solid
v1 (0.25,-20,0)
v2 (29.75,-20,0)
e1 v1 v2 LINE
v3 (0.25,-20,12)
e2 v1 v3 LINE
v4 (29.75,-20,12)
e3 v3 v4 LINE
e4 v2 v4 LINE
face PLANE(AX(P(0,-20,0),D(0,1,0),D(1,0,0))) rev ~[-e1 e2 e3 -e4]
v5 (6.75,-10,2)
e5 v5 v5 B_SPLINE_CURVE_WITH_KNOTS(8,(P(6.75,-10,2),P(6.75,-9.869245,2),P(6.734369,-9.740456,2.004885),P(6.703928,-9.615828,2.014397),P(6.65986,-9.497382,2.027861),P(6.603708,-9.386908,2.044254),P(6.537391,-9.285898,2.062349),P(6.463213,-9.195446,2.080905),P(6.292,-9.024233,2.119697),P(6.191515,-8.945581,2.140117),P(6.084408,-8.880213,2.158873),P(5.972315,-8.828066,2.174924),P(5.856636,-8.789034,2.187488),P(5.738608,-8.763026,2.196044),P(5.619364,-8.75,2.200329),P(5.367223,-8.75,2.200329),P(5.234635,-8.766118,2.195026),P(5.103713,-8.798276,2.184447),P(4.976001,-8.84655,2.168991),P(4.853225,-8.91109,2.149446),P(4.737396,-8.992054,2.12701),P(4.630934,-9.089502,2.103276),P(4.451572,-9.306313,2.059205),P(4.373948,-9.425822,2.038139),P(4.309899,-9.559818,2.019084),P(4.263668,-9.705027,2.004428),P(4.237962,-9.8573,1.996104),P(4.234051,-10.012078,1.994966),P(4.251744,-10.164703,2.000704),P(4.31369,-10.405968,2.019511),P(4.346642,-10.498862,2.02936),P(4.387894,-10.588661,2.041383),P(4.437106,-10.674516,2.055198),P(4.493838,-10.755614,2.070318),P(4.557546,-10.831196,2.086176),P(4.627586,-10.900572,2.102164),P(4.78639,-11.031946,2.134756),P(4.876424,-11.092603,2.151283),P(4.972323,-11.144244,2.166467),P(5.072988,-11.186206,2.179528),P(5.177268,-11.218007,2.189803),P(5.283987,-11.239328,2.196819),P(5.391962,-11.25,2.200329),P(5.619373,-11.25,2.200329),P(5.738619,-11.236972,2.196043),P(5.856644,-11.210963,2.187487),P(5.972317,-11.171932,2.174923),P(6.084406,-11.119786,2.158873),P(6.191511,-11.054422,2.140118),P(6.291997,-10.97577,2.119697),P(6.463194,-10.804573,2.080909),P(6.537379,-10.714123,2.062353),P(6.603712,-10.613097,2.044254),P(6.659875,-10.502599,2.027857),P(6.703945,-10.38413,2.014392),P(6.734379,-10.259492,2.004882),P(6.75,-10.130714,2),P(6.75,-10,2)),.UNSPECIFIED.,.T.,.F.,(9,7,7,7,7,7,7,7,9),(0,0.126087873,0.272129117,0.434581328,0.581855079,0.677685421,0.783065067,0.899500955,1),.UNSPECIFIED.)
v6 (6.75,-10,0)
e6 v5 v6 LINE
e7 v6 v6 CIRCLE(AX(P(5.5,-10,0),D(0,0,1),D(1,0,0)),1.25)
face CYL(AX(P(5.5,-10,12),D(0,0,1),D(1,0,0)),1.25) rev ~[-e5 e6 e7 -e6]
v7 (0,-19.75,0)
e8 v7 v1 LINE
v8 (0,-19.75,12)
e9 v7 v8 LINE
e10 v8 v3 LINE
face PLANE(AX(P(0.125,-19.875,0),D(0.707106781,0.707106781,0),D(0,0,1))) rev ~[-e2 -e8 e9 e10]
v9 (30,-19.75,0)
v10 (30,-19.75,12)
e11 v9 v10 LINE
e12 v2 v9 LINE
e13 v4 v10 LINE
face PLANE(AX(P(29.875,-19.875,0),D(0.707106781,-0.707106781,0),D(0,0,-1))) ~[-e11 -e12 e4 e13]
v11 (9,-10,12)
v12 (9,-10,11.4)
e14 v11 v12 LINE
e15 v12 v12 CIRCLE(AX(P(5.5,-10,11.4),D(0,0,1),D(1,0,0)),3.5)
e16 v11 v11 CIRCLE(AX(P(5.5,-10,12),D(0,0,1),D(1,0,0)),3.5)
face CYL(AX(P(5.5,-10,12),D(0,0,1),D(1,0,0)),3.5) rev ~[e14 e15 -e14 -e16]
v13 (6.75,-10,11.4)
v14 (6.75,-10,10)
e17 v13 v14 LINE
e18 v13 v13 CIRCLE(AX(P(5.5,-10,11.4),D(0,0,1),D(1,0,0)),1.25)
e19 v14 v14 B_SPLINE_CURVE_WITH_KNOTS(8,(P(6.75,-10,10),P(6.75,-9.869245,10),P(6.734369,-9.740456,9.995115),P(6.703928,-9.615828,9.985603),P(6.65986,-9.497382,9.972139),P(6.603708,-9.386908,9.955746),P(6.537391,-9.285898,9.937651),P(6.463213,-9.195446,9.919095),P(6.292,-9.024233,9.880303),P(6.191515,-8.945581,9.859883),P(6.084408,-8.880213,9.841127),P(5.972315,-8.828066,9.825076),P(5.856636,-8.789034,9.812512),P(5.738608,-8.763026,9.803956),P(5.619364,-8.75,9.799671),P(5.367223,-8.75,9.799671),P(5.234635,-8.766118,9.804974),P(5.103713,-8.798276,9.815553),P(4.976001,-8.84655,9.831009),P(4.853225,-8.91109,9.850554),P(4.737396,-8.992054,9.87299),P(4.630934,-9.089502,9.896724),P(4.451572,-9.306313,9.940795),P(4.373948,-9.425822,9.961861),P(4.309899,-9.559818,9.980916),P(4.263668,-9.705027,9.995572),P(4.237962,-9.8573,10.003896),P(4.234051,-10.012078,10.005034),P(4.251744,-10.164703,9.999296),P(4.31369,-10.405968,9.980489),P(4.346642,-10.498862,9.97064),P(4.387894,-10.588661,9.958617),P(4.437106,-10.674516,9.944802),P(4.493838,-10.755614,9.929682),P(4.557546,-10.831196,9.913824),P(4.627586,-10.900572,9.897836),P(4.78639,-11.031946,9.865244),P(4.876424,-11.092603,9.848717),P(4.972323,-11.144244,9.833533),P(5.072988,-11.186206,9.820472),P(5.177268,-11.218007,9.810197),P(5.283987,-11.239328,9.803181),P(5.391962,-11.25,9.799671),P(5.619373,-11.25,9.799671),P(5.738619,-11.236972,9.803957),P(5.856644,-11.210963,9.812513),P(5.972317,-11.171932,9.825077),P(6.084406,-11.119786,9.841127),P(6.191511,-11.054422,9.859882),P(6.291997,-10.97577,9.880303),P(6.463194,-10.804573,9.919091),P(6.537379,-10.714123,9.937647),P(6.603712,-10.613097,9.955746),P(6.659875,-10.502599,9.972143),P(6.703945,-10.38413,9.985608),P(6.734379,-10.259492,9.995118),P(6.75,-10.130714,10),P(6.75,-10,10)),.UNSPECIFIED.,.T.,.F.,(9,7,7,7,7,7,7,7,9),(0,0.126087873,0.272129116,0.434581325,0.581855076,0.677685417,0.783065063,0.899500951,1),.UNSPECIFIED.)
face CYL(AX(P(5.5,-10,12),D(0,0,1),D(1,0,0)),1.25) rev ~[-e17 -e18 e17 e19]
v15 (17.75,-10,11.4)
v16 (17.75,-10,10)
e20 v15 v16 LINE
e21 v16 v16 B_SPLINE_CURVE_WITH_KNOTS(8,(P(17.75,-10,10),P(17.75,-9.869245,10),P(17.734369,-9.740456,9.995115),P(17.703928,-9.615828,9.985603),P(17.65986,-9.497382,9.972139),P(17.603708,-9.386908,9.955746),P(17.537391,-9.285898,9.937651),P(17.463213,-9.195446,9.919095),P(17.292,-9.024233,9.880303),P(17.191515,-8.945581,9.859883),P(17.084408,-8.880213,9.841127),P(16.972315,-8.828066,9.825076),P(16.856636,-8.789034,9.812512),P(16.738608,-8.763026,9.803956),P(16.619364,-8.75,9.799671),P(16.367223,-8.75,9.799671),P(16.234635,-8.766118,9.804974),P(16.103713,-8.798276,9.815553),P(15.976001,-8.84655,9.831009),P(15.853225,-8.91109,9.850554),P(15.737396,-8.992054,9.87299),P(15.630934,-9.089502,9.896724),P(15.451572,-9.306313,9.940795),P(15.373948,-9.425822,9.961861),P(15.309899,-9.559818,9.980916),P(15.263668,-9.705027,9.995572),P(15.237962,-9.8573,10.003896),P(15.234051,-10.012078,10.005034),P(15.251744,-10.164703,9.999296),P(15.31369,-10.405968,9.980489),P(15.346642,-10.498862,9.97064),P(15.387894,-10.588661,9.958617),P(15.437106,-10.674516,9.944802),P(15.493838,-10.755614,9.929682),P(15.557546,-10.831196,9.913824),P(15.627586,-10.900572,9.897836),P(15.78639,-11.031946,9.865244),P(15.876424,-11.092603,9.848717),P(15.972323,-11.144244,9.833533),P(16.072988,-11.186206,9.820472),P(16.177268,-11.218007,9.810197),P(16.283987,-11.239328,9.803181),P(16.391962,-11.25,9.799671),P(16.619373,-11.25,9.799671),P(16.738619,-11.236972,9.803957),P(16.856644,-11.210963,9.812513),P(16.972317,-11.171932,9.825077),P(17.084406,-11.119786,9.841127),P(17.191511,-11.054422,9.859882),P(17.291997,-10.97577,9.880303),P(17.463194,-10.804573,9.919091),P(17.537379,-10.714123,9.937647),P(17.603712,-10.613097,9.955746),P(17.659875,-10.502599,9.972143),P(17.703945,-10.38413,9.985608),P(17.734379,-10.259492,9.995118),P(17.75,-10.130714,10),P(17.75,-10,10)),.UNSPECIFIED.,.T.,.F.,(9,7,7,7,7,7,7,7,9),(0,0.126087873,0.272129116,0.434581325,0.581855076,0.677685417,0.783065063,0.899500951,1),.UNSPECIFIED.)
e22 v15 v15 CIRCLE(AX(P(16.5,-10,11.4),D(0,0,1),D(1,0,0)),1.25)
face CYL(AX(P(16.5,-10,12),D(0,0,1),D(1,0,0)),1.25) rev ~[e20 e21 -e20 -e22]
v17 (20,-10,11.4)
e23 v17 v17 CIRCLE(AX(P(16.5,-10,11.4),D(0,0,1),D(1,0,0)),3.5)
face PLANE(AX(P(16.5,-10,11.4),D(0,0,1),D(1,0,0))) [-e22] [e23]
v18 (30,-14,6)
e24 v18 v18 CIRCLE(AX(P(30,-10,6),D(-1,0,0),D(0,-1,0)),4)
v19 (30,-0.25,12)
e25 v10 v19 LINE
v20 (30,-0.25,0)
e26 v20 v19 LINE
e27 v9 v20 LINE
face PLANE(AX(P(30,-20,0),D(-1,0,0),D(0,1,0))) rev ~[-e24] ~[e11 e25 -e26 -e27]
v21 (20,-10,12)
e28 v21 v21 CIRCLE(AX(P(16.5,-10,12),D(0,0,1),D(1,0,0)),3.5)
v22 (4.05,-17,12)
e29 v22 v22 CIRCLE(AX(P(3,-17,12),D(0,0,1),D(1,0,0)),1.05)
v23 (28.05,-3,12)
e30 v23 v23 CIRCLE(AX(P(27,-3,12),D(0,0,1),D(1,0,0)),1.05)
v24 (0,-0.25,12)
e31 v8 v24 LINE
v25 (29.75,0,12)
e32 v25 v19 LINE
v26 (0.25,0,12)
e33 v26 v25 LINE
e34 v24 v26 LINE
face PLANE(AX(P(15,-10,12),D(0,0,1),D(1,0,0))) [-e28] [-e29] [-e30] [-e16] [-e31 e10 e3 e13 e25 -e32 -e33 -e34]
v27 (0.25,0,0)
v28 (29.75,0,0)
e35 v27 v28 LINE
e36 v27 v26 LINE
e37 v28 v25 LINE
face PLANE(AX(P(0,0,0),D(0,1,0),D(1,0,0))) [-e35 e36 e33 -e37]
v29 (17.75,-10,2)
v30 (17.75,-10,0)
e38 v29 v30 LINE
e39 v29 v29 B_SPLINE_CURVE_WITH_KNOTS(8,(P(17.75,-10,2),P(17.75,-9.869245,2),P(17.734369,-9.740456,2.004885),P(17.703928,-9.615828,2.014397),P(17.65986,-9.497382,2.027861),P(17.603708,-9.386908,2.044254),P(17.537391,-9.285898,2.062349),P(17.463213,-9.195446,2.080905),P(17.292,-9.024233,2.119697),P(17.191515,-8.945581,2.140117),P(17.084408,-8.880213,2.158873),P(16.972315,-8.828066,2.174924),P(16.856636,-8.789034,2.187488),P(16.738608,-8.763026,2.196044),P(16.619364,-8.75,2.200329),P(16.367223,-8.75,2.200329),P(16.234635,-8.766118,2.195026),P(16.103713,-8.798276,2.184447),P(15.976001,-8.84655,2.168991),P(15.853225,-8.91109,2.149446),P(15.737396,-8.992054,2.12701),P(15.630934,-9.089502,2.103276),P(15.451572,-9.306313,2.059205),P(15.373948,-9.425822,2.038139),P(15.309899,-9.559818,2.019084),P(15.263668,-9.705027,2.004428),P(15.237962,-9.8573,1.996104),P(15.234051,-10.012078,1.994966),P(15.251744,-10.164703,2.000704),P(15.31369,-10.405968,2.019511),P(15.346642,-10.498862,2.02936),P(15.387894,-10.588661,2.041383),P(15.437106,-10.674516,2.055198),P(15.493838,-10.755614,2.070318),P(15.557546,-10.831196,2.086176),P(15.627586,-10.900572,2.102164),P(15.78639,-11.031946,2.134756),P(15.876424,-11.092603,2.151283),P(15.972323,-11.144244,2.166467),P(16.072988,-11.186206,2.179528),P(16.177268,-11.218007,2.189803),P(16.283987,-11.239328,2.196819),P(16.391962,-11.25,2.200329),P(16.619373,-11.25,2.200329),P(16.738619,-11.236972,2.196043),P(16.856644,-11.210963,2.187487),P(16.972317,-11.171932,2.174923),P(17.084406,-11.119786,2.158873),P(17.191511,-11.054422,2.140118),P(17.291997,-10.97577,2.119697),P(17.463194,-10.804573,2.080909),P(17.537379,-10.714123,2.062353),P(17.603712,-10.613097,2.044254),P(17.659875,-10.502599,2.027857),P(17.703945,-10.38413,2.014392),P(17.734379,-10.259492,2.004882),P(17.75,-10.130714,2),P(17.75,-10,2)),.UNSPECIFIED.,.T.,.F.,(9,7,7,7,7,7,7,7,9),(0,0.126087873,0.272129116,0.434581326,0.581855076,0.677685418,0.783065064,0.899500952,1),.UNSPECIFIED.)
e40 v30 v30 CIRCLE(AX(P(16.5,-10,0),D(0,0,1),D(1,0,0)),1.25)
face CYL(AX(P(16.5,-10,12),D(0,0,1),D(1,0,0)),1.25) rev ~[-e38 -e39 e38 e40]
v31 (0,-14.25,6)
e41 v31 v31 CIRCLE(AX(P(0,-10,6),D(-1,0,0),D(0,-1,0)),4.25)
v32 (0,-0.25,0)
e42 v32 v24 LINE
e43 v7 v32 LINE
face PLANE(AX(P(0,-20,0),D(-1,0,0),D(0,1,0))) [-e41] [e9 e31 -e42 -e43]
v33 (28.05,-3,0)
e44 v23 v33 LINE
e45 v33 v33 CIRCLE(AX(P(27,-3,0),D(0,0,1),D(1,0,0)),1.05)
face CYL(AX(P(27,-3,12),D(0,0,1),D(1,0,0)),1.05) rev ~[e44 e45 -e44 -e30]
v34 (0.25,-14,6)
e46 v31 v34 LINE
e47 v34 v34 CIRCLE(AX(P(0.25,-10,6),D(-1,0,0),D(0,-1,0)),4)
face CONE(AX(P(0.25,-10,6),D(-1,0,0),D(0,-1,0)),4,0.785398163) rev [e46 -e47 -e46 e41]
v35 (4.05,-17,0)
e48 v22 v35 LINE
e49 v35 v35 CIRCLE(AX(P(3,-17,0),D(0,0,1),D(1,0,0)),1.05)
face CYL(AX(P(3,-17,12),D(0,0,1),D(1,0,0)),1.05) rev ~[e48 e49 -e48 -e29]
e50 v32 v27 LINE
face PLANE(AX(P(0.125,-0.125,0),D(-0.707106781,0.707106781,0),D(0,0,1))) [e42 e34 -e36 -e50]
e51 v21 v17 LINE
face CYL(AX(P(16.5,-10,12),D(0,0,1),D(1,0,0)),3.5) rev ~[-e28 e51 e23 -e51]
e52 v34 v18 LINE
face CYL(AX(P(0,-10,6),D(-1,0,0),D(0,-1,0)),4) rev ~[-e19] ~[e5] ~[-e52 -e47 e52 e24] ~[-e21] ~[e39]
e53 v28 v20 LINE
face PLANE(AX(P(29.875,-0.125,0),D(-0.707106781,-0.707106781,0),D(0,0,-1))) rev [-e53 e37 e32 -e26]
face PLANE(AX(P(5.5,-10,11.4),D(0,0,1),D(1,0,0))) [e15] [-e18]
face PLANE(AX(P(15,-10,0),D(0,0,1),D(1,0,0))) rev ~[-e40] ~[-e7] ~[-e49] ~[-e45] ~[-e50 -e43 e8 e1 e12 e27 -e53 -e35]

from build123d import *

# Parameters (mm, degrees)
F0_W      = 30
F0_H      = 20
F1_DEPTH  = 12
F2_R      = 4
F3_DEPTH  = 30
F4_R      = 1.25
F5_DEPTH  = 25
F4_R_2    = 1.05
F8_DEPTH  = 25
F9_SIZE   = 0.25
F4_R_3    = 3.5
F4_R_4    = 2.5
F10_DEPTH = 0.6


with BuildPart() as f1:
    # F0 (on Top) → F1 (new body)
    with BuildSketch(Plane.XY):
        with Locations((15, -10)):
            Rectangle(F0_W, F0_H)
    extrude(amount=F1_DEPTH)

    # F2 (on face) → F3 (cut)
    with BuildSketch(Plane(origin=(0, 0, 0), x_dir=(0, -1, 0), z_dir=(-1, 0, 0))):
        with Locations((10, 6)):
            Circle(F2_R)
    extrude(amount=-F3_DEPTH, mode=Mode.SUBTRACT)

    # F4 (on face) → F5 (cut)
    with BuildSketch(Plane.XY.offset(12)):
        with Locations((5.5, -10)):
            Circle(F4_R)
        with Locations((16.5, -10)):
            Circle(F4_R)
    extrude(amount=-F5_DEPTH, mode=Mode.SUBTRACT)

    # F4 (on face) → F8 (cut)
    with BuildSketch(Plane.XY.offset(12)):
        with Locations((3, -17)):
            Circle(F4_R_2)
        with Locations((27, -3)):
            Circle(F4_R_2)
    extrude(amount=-F8_DEPTH, mode=Mode.SUBTRACT)

    # F9
    f9_edges = [f1.edges().sort_by_distance(p)[0] for p in [
        (0, -6, 6),
        (0, 0, 6),
        (0, -20, 6),
        (30, 0, 6),
        (30, -20, 6),
    ]]
    chamfer(f9_edges, length=F9_SIZE)

    # F4 (on face) → F10 (cut)
    with BuildSketch(Plane.XY.offset(12)):
        with Locations((5.5, -10)):
            Circle(F4_R_3)
        with Locations((5.5, -10)):
            Circle(F4_R_4, mode=Mode.SUBTRACT)
        with Locations((16.5, -10)):
            Circle(F4_R_3)
        with Locations((16.5, -10)):
            Circle(F4_R_4, mode=Mode.SUBTRACT)
        with Locations((16.5, -10)):
            Circle(F4_R_4)
        with Locations((16.5, -10)):
            Circle(F4_R, mode=Mode.SUBTRACT)
        with Locations((5.5, -10)):
            Circle(F4_R_4)
        with Locations((5.5, -10)):
            Circle(F4_R, mode=Mode.SUBTRACT)
    extrude(amount=-F10_DEPTH, mode=Mode.SUBTRACT)


solid = f1.part
